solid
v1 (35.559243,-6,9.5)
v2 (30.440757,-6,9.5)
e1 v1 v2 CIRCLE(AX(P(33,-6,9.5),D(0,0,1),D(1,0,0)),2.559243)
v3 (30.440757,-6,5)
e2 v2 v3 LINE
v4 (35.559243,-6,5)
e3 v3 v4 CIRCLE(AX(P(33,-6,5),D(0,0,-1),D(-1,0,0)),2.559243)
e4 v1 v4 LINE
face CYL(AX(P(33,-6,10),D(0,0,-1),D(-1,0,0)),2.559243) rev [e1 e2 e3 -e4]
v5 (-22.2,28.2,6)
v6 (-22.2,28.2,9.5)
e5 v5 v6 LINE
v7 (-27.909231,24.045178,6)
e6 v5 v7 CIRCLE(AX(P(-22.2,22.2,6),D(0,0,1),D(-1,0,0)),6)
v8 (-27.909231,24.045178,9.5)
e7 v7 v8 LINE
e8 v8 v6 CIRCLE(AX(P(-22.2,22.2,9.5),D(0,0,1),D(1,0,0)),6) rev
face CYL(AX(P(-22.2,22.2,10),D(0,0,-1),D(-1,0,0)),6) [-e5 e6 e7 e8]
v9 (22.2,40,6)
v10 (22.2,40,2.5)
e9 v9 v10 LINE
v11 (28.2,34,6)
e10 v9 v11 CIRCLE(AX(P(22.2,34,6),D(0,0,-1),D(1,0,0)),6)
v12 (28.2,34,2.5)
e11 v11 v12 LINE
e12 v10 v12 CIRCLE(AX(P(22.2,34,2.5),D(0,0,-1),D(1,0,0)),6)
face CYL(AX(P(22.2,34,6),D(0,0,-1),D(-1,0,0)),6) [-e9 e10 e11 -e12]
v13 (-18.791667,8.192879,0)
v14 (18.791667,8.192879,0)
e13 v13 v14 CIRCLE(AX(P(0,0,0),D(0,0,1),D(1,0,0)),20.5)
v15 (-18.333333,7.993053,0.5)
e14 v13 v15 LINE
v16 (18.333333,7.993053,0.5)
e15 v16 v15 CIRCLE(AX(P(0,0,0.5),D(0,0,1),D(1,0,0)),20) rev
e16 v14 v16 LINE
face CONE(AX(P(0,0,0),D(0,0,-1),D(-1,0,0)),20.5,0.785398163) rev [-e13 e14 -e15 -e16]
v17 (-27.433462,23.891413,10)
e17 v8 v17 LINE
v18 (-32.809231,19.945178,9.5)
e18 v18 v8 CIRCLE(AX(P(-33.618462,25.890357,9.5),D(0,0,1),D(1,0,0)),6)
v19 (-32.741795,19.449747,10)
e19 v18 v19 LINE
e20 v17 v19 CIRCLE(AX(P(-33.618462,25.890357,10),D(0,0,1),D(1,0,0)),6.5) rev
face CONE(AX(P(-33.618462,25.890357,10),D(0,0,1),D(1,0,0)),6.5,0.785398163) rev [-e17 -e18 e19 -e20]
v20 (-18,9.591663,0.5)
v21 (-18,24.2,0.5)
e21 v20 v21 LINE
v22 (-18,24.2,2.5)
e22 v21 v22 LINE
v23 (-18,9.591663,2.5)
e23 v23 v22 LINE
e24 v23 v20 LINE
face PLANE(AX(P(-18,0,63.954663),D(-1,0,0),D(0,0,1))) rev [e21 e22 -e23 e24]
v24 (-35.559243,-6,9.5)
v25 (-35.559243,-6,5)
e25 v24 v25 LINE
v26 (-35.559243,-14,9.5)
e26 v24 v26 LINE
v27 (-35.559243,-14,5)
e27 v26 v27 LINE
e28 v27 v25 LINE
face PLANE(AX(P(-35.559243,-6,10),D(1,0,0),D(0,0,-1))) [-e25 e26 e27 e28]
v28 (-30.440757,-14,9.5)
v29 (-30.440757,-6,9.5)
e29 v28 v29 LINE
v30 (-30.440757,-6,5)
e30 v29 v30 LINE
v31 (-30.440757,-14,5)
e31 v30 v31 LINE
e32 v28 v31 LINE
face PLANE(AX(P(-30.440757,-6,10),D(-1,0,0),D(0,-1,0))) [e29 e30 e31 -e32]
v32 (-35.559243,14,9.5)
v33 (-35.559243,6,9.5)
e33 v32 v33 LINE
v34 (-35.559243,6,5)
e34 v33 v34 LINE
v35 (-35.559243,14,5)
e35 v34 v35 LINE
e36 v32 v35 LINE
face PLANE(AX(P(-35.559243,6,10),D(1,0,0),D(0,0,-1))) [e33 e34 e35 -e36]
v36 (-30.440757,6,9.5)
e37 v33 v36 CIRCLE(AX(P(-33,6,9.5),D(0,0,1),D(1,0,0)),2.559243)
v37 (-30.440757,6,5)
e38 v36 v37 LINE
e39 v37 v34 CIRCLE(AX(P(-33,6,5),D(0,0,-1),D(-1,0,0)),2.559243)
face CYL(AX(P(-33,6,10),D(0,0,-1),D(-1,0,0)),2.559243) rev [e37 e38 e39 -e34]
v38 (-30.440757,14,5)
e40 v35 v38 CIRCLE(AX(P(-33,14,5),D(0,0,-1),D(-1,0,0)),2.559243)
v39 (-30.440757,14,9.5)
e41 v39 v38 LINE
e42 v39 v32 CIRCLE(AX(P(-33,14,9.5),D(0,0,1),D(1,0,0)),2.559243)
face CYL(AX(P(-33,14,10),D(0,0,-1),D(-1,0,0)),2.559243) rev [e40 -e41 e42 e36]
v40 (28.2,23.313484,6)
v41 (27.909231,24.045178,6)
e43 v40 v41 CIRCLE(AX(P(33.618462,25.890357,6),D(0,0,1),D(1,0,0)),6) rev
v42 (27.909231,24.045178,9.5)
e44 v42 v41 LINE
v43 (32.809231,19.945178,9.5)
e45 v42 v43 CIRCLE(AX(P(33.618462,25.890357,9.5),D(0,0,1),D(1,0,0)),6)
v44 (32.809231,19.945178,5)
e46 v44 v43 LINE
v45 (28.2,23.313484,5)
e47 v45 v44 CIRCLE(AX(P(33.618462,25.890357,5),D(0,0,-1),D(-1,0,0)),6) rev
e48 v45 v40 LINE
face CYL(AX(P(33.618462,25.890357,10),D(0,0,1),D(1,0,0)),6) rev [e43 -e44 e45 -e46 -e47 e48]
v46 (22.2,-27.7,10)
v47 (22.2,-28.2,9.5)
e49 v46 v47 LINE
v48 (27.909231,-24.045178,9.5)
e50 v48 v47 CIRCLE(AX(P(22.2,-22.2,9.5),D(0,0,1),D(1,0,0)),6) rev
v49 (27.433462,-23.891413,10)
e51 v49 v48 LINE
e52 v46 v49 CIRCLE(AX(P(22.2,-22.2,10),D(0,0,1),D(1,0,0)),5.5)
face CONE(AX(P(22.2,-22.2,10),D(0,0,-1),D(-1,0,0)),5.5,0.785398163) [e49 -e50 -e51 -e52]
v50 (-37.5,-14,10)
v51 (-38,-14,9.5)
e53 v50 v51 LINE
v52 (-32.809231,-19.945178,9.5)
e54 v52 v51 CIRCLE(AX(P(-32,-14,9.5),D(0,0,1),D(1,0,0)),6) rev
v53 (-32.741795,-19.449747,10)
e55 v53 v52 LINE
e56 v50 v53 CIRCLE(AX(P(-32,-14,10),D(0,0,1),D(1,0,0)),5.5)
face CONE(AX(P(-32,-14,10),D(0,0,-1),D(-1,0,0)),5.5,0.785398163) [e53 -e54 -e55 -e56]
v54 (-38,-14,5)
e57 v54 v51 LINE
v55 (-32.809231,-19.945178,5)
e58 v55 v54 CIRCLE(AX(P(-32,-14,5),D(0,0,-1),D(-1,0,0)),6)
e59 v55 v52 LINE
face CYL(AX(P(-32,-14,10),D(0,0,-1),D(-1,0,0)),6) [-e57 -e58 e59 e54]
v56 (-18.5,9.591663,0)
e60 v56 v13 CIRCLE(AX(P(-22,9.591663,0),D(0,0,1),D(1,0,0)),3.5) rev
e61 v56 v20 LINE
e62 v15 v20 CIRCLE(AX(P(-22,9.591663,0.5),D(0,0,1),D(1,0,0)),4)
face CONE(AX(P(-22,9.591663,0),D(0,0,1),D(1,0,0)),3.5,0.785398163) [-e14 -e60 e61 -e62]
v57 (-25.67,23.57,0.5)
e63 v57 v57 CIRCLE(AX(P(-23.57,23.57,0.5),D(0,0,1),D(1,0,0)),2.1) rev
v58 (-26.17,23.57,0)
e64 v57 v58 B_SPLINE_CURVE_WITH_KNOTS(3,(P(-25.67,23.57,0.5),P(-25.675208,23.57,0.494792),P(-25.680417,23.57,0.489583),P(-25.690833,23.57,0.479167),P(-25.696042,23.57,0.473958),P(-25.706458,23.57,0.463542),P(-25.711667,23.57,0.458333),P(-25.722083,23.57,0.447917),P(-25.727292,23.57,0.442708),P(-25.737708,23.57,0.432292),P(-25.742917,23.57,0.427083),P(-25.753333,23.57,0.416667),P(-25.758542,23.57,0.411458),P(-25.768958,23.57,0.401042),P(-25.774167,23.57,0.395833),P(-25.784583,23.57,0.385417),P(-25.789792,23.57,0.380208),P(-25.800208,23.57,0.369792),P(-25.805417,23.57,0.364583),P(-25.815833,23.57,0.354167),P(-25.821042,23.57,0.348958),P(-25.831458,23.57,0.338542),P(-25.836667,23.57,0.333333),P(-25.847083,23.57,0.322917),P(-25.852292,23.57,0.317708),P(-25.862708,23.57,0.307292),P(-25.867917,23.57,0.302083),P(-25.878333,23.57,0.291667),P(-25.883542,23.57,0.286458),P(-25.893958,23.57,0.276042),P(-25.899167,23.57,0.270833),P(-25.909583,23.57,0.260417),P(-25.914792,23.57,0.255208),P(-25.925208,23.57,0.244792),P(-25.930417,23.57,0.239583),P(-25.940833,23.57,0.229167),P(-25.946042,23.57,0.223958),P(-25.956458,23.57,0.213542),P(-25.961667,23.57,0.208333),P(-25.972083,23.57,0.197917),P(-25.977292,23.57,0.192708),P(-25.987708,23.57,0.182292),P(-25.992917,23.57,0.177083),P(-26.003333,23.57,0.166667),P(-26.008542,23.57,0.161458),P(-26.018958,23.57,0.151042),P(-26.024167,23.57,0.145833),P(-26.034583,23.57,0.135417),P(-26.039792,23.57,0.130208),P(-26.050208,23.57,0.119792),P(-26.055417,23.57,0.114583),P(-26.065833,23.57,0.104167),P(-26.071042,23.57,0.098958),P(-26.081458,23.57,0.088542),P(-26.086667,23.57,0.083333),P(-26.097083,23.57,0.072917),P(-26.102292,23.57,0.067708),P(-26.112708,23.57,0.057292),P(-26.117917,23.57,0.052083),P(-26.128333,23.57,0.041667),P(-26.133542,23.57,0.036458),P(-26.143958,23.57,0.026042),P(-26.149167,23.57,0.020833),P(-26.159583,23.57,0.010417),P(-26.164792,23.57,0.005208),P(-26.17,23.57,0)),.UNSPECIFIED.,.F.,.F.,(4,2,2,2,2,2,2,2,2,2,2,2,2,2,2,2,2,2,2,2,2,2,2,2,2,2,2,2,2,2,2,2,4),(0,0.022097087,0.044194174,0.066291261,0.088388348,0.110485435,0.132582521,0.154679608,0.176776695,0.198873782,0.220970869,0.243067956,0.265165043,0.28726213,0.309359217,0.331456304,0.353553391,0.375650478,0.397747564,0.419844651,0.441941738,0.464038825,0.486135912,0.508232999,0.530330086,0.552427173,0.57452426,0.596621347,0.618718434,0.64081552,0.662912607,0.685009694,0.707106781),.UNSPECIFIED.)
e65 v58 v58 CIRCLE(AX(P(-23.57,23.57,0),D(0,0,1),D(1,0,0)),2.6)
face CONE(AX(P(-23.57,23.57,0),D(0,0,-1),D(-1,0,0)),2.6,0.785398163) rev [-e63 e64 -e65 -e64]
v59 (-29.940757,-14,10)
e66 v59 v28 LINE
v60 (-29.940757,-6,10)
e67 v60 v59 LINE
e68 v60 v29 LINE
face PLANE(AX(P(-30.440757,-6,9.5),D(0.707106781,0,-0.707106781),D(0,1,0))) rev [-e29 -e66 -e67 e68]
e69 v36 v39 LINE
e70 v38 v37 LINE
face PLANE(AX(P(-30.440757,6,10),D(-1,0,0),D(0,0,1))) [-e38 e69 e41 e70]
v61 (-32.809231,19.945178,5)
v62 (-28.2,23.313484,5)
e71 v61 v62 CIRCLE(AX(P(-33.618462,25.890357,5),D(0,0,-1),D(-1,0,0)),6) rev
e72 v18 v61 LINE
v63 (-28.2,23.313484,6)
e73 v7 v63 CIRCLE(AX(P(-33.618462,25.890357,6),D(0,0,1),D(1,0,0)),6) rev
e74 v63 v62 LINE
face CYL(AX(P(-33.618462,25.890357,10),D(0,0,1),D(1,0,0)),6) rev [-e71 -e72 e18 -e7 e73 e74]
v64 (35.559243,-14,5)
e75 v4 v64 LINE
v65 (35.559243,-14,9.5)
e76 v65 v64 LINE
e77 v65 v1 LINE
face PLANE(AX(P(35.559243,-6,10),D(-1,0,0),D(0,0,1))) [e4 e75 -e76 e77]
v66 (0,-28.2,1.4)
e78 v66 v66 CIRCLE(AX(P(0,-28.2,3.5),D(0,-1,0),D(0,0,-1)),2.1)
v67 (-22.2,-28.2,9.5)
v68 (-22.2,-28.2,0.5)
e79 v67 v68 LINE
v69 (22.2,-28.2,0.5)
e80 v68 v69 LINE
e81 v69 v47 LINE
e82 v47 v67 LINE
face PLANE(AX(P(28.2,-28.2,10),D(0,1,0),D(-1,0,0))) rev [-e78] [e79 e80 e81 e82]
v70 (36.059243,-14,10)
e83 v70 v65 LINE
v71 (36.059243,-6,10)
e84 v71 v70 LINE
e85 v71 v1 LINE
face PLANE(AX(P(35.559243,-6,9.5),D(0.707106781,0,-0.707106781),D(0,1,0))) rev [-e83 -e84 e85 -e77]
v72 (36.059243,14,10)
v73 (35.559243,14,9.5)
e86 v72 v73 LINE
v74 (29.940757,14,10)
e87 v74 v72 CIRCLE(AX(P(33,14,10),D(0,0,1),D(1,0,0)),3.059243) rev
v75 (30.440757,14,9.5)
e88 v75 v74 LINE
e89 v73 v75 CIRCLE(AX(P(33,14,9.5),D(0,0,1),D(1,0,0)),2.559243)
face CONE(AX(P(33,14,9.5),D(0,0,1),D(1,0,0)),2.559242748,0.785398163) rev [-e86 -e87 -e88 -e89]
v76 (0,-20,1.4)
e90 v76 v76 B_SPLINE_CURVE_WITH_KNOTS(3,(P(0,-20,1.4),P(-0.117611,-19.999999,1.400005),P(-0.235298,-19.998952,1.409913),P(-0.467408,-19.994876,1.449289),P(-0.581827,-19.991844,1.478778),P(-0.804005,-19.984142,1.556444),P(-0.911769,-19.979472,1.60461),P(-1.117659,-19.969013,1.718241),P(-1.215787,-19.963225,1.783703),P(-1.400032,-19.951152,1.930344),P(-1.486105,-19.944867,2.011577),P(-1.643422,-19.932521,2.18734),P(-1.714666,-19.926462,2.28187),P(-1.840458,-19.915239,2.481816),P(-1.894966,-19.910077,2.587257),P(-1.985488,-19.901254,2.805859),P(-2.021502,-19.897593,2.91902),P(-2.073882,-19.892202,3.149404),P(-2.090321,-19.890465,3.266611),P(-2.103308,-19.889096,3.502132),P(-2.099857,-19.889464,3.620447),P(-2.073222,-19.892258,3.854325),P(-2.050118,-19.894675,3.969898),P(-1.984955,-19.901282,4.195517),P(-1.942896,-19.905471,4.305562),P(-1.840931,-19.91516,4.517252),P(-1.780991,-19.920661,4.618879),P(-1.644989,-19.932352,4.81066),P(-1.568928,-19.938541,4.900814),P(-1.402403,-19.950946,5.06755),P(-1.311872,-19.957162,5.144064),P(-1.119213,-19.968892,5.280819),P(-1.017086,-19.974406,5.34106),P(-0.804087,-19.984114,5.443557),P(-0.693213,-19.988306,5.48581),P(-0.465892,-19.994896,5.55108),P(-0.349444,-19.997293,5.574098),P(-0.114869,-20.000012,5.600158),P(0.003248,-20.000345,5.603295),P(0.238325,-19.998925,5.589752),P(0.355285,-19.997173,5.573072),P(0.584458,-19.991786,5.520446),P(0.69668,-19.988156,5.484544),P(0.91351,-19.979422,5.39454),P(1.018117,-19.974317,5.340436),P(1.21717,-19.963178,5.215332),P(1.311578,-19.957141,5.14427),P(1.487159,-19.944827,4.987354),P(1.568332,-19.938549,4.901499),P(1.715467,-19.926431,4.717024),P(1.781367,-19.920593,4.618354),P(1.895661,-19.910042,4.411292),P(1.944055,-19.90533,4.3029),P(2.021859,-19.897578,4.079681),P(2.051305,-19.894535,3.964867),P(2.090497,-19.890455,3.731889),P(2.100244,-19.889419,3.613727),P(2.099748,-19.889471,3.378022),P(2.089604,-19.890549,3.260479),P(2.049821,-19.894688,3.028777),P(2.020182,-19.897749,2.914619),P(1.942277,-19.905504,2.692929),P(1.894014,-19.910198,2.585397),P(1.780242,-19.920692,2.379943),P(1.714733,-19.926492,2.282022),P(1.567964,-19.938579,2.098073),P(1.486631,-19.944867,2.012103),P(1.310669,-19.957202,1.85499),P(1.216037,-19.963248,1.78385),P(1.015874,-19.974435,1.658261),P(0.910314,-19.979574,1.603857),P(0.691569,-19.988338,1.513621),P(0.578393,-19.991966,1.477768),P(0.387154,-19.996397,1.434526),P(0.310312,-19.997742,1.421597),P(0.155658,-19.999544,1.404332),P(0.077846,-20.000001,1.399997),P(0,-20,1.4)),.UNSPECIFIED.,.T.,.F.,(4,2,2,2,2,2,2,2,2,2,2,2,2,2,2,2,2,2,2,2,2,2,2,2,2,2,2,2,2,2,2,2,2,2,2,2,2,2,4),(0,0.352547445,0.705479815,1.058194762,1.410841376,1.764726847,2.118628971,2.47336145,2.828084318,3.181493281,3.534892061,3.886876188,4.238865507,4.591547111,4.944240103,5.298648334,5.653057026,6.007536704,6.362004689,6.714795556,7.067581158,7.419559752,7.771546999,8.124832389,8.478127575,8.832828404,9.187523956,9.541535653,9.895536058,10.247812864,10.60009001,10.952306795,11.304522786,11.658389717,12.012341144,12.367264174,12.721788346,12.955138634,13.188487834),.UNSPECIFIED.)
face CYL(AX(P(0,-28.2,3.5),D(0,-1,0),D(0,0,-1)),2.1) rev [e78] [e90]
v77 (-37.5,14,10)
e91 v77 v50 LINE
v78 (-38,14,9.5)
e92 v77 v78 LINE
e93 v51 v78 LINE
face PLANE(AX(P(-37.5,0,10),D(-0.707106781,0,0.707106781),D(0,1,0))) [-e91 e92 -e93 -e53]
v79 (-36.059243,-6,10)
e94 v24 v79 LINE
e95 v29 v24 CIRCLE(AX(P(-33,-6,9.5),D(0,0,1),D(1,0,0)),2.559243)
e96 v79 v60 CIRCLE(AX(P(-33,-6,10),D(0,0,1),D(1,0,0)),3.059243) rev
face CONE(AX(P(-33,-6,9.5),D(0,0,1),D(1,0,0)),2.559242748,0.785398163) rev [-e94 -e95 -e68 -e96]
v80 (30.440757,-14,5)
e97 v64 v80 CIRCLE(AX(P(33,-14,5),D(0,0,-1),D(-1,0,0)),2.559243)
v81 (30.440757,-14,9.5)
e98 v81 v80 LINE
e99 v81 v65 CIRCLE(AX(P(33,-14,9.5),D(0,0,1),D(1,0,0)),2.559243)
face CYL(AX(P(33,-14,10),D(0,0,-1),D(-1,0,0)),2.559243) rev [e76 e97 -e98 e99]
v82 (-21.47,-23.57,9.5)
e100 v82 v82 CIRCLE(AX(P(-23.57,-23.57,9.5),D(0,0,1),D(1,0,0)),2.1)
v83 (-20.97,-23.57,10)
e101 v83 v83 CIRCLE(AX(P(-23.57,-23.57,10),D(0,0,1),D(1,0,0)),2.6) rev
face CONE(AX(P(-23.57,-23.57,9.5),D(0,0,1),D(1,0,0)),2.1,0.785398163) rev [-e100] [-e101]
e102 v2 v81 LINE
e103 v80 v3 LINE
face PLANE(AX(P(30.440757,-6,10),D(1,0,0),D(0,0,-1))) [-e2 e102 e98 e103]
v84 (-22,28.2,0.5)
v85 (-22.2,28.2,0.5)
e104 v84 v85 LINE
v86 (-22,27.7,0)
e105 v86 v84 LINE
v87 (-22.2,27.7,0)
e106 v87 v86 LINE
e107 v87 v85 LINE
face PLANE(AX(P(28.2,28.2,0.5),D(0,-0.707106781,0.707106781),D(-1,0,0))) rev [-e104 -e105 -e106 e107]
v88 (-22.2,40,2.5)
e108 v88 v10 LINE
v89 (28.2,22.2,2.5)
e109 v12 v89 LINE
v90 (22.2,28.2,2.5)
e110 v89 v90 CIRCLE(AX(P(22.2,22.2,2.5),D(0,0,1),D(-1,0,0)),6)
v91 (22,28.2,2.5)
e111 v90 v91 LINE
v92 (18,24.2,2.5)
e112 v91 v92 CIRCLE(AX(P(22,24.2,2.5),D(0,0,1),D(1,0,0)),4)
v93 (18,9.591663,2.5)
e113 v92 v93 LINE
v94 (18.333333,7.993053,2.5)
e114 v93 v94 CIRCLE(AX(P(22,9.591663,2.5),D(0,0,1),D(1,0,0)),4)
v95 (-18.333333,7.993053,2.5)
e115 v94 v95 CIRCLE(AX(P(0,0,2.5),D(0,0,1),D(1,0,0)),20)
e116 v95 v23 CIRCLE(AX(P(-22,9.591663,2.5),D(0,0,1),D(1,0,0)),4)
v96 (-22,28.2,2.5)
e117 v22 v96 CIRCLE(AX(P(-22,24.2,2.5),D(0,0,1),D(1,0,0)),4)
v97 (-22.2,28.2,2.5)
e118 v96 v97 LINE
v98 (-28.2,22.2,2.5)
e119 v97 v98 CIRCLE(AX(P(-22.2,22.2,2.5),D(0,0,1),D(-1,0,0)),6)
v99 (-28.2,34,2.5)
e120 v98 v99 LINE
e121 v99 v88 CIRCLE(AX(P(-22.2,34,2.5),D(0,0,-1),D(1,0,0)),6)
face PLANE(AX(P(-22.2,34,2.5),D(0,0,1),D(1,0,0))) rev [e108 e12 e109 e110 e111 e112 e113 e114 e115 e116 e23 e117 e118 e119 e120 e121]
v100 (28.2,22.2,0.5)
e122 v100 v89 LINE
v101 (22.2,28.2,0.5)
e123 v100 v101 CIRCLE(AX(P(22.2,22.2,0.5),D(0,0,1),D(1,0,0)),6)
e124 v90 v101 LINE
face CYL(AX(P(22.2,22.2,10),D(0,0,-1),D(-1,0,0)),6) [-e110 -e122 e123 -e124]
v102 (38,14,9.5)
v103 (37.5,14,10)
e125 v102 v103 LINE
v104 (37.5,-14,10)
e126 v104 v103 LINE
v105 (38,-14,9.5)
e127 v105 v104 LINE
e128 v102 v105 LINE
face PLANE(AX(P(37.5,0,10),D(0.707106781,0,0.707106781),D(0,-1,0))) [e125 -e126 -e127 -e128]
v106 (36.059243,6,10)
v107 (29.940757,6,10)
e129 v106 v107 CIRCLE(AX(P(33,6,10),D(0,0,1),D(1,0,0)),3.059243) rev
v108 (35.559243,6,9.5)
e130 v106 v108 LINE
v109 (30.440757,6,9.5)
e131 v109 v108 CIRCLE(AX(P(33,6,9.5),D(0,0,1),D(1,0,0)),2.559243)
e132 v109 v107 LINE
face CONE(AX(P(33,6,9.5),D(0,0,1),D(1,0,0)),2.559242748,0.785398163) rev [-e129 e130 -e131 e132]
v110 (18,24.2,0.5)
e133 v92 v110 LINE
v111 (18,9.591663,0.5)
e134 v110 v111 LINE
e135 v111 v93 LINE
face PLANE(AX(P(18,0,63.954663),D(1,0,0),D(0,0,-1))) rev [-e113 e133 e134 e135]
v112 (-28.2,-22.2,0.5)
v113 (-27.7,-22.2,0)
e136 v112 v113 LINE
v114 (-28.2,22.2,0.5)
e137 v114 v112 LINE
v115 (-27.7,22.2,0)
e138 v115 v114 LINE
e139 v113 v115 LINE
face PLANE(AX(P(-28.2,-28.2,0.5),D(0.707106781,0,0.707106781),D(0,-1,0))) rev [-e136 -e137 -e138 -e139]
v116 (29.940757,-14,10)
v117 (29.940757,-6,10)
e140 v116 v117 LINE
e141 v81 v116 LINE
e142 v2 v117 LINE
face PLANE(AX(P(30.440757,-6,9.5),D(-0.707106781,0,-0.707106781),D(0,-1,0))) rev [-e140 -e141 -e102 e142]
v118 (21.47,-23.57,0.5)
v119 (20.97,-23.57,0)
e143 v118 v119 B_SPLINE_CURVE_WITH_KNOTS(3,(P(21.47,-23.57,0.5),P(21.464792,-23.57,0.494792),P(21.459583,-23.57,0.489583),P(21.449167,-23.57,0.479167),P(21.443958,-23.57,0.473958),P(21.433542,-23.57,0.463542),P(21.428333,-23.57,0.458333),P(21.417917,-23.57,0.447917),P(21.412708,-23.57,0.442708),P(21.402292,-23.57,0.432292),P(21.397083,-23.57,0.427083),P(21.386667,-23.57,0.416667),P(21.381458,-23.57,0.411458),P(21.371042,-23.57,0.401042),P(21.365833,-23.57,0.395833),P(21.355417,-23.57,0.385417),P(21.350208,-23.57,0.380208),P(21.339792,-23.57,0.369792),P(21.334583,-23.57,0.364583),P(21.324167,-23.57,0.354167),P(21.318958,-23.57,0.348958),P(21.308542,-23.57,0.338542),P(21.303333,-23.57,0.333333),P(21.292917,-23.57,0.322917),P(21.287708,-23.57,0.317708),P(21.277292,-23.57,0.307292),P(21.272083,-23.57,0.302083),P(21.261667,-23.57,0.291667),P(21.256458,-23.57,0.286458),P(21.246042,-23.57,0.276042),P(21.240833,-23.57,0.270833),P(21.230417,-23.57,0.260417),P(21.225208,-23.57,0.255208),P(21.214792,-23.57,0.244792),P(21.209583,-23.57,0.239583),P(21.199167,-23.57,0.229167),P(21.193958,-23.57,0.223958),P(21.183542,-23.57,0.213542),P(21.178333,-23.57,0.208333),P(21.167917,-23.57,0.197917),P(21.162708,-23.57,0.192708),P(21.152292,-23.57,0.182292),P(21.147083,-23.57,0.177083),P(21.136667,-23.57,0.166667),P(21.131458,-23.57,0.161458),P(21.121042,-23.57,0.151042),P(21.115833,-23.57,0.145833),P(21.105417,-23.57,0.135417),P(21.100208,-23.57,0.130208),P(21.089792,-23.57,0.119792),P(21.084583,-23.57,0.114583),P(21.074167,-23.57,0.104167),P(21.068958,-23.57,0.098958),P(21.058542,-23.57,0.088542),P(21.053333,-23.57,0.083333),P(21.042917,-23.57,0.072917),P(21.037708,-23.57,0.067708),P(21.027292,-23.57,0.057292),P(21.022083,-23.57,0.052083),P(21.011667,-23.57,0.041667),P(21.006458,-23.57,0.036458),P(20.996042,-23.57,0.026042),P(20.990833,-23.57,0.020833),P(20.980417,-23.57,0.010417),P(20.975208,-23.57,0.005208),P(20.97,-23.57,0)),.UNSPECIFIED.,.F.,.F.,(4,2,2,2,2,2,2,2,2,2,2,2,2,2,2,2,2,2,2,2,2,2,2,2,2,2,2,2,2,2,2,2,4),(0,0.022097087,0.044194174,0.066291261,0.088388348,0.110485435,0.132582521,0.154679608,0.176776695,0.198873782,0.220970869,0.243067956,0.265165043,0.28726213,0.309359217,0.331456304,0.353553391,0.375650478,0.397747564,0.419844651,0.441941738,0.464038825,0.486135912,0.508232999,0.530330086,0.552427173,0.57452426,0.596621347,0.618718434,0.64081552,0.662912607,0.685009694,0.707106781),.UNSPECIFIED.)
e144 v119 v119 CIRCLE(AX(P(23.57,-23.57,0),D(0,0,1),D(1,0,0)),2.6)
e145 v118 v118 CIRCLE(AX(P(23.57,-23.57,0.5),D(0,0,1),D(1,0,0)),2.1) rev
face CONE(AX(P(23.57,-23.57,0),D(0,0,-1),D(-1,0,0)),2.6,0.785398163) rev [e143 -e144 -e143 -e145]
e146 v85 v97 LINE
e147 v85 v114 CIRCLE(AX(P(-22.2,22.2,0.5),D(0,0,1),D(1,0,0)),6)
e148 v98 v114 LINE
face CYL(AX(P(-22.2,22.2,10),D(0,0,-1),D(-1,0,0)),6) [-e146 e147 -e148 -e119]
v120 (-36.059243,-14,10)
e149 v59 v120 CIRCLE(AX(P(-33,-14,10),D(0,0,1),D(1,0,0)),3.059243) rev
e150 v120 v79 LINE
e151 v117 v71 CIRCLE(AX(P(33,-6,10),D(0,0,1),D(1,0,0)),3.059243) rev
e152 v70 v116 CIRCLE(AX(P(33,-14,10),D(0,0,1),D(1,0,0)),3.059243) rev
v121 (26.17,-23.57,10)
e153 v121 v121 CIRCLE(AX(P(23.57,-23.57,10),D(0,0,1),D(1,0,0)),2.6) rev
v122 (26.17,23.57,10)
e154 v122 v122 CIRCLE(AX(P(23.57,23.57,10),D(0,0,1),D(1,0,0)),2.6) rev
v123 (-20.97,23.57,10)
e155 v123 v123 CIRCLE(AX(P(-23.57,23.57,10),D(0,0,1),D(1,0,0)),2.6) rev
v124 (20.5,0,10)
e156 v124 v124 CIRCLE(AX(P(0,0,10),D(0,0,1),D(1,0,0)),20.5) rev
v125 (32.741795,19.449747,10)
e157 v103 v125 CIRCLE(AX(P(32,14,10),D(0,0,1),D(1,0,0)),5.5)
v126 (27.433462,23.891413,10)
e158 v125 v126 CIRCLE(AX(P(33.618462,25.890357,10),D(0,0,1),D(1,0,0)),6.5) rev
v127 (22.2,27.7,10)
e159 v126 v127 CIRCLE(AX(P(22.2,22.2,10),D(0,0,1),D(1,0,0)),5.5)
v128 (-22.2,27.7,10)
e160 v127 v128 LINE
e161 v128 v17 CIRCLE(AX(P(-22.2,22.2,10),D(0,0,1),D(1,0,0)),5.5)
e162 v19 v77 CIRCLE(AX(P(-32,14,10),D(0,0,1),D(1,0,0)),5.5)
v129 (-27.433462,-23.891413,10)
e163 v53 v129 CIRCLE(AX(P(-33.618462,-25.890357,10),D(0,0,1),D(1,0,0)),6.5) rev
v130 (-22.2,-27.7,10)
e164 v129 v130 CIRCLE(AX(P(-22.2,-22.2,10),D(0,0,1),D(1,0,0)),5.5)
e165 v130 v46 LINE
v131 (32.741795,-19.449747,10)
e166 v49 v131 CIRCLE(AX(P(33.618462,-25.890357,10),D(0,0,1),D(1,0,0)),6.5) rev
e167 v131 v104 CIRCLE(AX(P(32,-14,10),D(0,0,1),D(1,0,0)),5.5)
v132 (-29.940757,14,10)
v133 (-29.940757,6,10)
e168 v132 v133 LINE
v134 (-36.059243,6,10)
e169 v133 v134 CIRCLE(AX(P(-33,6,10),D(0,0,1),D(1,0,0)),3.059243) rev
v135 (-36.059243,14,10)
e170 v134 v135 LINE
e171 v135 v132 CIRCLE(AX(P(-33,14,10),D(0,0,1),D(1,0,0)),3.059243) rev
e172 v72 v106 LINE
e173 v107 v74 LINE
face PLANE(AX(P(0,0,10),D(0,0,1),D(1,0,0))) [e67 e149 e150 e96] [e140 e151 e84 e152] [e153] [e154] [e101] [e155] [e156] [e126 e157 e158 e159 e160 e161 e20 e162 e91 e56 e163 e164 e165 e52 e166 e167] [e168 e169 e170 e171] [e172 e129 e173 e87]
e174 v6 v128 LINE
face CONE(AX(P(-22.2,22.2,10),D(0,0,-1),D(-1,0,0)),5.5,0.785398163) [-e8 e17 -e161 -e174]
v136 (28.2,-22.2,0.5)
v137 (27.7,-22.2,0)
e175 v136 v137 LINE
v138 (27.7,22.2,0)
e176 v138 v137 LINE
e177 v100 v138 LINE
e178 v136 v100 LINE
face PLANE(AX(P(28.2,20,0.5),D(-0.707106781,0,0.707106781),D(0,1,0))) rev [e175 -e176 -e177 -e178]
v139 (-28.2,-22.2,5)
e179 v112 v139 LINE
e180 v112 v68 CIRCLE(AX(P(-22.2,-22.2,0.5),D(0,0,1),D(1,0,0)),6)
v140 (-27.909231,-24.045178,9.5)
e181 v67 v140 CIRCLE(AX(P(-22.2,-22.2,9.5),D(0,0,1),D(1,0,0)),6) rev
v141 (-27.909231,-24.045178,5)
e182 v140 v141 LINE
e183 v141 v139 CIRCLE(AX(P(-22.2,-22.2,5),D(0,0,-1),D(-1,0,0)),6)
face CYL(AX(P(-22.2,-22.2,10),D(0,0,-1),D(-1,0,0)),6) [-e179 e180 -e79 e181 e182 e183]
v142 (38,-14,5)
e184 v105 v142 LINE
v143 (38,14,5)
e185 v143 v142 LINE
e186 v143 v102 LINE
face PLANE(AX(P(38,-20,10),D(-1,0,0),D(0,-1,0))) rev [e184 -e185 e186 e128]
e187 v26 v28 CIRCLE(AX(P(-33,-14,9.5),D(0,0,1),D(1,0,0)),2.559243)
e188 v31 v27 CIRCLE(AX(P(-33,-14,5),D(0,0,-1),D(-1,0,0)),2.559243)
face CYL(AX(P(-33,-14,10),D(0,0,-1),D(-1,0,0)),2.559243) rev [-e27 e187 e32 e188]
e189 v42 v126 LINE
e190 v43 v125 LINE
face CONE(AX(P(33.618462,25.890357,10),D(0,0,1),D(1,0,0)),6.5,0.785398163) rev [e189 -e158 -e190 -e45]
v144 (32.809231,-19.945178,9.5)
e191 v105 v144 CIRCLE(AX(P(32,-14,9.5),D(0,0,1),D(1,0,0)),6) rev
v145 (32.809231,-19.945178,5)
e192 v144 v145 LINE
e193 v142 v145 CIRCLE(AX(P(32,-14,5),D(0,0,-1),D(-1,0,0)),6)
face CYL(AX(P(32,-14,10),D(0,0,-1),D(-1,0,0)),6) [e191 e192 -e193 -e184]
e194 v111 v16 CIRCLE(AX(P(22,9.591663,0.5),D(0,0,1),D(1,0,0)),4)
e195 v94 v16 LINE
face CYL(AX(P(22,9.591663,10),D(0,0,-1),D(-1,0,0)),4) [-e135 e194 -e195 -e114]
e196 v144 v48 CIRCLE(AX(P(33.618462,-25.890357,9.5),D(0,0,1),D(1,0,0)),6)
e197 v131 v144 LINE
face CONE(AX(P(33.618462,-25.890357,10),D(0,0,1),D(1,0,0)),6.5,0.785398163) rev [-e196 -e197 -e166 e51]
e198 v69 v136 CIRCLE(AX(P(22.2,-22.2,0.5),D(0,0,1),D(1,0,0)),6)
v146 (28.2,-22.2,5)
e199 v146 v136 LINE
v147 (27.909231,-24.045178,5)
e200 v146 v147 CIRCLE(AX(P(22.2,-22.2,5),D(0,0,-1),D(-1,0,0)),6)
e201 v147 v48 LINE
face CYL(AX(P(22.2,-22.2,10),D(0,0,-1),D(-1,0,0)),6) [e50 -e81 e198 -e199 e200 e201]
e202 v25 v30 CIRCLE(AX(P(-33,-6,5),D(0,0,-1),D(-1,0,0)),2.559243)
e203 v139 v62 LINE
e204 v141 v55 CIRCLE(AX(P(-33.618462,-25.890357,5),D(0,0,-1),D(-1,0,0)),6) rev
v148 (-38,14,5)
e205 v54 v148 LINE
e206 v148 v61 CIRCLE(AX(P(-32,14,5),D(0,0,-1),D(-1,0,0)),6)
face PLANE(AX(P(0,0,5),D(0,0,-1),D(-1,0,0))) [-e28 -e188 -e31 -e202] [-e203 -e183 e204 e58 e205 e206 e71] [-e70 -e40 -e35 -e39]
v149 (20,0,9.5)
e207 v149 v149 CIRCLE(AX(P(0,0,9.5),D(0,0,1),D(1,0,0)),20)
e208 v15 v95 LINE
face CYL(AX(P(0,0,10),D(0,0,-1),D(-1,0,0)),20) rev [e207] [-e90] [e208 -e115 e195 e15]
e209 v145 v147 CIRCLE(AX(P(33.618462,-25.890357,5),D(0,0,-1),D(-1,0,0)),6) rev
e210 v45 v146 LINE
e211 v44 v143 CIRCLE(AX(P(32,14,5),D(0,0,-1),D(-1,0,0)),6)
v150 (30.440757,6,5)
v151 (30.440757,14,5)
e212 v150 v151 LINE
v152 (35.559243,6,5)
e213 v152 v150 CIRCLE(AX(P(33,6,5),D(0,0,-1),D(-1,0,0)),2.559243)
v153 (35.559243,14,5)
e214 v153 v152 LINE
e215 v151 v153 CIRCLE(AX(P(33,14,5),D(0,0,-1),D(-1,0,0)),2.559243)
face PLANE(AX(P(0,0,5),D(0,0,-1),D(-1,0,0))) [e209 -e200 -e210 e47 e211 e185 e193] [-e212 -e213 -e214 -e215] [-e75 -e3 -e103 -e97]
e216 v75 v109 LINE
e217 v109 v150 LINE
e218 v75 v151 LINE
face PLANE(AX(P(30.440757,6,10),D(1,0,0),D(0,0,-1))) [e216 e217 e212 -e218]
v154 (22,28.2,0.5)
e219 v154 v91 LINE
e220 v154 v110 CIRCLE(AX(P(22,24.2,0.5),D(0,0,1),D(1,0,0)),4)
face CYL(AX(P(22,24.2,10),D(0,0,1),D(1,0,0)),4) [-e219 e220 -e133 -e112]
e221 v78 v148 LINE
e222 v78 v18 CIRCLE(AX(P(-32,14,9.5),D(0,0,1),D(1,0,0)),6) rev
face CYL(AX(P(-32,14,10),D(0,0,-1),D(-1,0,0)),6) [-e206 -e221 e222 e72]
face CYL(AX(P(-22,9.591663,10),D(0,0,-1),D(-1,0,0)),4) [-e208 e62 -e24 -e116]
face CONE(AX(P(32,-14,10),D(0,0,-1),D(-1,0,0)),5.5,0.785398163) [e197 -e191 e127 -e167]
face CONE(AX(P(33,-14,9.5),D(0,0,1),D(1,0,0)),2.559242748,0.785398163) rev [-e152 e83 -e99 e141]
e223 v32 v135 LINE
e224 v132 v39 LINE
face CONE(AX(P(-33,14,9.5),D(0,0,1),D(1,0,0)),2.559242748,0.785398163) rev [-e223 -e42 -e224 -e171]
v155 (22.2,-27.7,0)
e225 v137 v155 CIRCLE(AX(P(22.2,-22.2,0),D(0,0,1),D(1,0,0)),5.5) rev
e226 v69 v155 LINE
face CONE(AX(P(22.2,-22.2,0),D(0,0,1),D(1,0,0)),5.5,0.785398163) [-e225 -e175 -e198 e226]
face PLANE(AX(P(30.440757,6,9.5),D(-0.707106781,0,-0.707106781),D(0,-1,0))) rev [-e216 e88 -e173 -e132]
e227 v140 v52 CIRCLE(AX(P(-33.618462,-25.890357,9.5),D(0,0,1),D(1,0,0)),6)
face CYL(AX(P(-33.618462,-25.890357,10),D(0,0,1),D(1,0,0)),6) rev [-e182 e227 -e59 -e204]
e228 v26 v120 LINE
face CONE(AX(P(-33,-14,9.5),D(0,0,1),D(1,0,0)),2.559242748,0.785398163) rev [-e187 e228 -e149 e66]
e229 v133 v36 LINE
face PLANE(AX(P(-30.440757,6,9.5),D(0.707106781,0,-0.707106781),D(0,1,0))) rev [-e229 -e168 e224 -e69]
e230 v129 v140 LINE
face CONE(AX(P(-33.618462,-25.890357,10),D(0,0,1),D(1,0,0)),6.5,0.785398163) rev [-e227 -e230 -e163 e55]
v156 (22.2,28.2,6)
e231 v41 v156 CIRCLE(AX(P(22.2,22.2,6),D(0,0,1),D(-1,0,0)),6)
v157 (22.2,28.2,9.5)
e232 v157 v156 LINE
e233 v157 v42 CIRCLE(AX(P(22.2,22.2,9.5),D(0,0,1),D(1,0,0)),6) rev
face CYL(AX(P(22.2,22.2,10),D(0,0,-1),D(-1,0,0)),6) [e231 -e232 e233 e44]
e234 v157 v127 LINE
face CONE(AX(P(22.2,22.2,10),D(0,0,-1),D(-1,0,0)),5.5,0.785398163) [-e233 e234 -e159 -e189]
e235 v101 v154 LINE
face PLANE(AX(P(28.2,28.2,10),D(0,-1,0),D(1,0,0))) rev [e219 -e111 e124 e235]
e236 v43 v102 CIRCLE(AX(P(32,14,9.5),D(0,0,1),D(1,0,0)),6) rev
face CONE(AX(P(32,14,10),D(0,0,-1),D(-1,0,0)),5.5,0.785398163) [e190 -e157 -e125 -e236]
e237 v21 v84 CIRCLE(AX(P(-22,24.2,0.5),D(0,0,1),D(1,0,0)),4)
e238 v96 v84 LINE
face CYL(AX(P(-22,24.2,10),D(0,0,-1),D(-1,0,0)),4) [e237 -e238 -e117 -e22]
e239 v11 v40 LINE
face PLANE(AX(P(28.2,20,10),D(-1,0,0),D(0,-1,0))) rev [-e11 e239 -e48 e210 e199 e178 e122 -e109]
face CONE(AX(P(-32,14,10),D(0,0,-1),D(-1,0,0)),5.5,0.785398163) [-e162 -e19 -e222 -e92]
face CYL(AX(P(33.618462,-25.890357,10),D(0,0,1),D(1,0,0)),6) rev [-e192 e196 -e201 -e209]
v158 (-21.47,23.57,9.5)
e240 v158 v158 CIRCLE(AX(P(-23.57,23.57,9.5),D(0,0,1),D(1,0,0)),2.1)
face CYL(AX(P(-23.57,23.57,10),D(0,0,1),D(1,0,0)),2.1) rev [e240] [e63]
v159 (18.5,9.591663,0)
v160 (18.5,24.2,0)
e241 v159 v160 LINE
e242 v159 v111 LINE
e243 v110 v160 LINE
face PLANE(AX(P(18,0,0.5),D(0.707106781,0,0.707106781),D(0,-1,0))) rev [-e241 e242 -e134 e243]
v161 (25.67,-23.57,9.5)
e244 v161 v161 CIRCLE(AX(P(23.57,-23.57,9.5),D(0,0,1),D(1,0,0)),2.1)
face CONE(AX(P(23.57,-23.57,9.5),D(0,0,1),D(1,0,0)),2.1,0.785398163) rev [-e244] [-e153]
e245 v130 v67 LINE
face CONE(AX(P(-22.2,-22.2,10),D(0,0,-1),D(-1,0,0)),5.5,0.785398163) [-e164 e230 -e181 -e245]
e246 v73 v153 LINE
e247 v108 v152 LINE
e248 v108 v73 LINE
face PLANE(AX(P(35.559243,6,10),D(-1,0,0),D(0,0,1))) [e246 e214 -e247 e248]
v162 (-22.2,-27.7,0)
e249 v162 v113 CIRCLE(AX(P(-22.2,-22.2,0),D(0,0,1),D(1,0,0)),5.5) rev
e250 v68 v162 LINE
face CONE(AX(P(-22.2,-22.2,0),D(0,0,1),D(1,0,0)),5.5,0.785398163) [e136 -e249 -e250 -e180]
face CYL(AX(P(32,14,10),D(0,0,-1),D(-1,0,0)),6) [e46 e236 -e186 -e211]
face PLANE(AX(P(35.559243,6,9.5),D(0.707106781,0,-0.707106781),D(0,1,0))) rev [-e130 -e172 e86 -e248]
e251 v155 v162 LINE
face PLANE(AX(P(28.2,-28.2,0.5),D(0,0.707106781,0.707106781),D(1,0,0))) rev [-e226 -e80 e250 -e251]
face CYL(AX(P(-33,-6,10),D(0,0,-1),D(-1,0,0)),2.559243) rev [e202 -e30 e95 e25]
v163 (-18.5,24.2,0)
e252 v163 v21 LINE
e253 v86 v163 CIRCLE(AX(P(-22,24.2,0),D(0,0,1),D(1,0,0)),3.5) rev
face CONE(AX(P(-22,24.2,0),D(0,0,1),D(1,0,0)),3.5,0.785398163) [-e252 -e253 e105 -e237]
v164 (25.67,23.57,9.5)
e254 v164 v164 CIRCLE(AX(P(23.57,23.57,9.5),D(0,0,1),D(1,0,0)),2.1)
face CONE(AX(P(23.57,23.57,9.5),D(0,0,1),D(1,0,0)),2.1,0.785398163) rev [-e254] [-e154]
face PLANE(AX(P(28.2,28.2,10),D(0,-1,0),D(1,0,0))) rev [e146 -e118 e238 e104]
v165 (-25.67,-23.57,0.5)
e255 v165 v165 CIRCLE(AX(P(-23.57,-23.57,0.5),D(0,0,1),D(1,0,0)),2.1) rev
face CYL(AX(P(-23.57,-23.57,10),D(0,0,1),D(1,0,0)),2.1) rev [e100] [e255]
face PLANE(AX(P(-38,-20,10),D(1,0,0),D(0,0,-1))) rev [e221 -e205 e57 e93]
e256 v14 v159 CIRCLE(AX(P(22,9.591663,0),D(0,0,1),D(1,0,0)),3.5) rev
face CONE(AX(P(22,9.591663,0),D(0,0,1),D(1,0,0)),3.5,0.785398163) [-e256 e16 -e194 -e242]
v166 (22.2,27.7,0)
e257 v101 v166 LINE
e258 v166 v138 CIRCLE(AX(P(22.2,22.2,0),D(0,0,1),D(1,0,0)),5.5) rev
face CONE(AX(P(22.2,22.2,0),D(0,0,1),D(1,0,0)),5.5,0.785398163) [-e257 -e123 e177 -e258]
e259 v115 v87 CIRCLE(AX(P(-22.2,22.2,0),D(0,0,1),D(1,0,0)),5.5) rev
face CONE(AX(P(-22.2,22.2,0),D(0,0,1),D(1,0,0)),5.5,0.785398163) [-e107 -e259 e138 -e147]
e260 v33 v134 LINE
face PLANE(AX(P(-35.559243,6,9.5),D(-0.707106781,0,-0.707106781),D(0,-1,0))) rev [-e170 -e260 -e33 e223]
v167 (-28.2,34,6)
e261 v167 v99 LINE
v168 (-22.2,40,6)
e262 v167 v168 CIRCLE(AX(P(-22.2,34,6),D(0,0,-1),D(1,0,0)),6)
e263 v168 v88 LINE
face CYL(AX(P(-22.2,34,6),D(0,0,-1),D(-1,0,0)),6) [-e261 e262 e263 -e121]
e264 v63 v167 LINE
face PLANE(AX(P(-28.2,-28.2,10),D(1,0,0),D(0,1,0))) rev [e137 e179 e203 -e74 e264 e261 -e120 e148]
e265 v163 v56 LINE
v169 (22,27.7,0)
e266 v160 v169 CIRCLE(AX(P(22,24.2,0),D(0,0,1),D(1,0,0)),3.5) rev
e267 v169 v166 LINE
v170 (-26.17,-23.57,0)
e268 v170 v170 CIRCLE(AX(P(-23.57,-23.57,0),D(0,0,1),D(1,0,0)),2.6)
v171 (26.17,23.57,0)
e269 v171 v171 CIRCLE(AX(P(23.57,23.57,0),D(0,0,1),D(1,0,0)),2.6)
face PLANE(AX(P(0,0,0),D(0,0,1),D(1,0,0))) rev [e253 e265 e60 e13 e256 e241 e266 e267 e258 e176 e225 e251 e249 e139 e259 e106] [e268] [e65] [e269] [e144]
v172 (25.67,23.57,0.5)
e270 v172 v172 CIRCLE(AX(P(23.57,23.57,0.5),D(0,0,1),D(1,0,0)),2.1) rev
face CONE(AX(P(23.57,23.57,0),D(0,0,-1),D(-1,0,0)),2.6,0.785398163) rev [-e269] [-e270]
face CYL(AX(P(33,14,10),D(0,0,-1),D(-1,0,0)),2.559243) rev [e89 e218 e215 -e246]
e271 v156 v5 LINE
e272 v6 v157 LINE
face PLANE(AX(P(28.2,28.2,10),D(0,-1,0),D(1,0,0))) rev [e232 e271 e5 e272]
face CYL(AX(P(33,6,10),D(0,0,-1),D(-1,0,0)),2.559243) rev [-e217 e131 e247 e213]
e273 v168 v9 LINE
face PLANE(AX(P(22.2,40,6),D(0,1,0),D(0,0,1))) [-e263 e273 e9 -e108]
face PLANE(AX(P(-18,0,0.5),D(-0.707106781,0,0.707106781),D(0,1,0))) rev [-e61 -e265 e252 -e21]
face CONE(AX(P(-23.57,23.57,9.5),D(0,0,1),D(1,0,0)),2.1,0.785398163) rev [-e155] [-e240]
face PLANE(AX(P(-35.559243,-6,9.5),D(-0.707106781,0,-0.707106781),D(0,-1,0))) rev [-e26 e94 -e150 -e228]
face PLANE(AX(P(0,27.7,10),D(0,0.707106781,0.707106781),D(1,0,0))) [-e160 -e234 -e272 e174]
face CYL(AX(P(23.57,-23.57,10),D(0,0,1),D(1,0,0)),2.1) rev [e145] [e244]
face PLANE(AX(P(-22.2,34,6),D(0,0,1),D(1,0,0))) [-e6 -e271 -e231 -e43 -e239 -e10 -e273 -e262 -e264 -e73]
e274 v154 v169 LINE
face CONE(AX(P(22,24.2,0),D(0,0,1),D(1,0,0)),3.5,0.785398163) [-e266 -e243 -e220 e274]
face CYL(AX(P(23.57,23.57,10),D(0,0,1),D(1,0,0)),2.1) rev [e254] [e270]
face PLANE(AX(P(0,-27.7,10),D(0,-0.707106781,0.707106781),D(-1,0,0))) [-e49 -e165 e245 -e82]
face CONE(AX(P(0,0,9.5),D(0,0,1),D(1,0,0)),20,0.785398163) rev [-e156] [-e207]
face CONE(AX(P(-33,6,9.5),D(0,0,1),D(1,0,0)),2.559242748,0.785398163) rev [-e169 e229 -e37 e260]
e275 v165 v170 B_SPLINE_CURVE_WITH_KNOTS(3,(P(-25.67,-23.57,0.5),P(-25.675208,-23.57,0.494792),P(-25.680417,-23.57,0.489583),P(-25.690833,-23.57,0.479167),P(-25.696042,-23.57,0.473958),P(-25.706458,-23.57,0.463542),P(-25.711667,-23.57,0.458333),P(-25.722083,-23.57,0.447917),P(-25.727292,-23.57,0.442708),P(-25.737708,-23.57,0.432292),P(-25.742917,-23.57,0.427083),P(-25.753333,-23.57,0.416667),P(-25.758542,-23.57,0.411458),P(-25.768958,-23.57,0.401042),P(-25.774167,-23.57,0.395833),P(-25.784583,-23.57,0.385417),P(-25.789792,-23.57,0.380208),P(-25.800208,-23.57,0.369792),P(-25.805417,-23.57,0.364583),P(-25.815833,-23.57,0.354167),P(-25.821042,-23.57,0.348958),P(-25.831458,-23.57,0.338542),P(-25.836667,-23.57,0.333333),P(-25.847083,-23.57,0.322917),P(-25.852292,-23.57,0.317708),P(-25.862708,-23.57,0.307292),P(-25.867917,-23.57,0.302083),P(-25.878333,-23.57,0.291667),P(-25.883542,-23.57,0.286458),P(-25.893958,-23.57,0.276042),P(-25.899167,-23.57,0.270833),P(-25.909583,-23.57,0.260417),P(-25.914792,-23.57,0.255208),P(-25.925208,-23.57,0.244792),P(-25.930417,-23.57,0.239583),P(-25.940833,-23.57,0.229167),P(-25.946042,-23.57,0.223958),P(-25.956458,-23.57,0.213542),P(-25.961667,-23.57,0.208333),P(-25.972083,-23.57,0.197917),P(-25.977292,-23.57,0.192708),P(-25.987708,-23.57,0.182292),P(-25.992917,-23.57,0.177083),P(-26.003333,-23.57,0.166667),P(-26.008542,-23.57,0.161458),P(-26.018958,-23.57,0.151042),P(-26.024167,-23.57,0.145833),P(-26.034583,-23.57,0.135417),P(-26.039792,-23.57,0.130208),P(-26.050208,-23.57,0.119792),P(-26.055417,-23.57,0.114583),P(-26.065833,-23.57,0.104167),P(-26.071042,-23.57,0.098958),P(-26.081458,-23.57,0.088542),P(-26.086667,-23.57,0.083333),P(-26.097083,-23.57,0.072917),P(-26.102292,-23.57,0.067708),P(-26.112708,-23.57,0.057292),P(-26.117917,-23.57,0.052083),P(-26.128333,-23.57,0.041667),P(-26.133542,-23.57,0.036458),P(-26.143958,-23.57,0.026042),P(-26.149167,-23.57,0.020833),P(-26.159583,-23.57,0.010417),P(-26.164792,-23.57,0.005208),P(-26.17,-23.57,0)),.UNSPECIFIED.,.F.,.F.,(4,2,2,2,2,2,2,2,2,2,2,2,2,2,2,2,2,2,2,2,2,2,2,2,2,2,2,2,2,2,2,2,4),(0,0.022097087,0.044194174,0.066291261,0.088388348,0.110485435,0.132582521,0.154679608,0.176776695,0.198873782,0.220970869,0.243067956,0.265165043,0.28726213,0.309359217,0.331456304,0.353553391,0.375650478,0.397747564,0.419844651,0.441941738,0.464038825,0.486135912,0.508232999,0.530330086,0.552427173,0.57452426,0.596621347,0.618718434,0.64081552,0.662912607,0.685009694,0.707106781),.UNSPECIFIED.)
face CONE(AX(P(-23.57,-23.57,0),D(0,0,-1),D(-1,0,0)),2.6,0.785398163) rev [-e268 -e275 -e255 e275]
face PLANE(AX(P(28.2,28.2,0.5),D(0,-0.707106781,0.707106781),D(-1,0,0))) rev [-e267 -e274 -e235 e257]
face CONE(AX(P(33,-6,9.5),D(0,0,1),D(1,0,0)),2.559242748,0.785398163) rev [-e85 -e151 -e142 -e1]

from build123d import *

# Parameters (mm, degrees)
SKETCH1_R                   = 20
BOSS_EXTRUDE1_DEPTH         = 10
FILLET1_R                   = 6
TAP_DRILL_FOR_M5_TAP1_D     = 4.2
CUT_EXTRUDE2_START          = 5
SKETCH4_OUTSIDE_W           = 97.034
SKETCH4_OUTSIDE_H           = 77.434
SKETCH4_OUTSIDE_W_2         = 56.4
SKETCH4_OUTSIDE_H_2         = 56.4
CUT_EXTRUDE2_DEPTH          = 44.365690319
FILLET2_R                   = 6
FILLET3_R                   = 6
TAP_DRILL_FOR_M5_TAP2_D     = 4.2
TAP_DRILL_FOR_M5_TAP2_DEPTH = 20
TAP_DRILL_FOR_M5_TAP2_TIP   = 1.2618073
BOSS_EXTRUDE2_START         = -6
BOSS_EXTRUDE2_DEPTH         = 3.5
SKETCH10_W                  = 36
SKETCH10_H                  = 49.806381251
CUT_EXTRUDE3_DEPTH          = 2.5
FILLET4_R                   = 4
CHAMFER1_SIZE               = 0.5


with BuildPart() as part:
    # Sketch1 → Boss-Extrude1 (new body)
    with BuildSketch(Plane.XY):
        Polygon((-28.2, -20), (-38, -20), (-38, 20), (-28.2, 20), (-28.2, 28.2), (28.2, 28.2), (28.2, 20), (38, 20), (38, -20), (28.2, -20), (28.2, -28.2), (-28.2, -28.2), align=None)
        Circle(SKETCH1_R, mode=Mode.SUBTRACT)
        with BuildLine():
            Line((-35.559242748, 6), (-35.559242748, 14))
            ThreePointArc((-35.559242748, 14), (-33, 16.559242748), (-30.440757252, 14))
            Line((-30.440757252, 14), (-30.440757252, 6))
            ThreePointArc((-30.440757252, 6), (-33, 3.440757252), (-35.559242748, 6))
        make_face(mode=Mode.SUBTRACT)
        with BuildLine():
            Line((-30.440757252, -6), (-30.440757252, -14))
            ThreePointArc((-30.440757252, -14), (-33, -16.559242748), (-35.559242748, -14))
            Line((-35.559242748, -14), (-35.559242748, -6))
            ThreePointArc((-35.559242748, -6), (-33, -3.440757252), (-30.440757252, -6))
        make_face(mode=Mode.SUBTRACT)
        with BuildLine():
            Line((35.559242748, -6), (35.559242748, -14))
            ThreePointArc((35.559242748, -14), (33, -16.559242748), (30.440757252, -14))
            Line((30.440757252, -14), (30.440757252, -6))
            ThreePointArc((30.440757252, -6), (33, -3.440757252), (35.559242748, -6))
        make_face(mode=Mode.SUBTRACT)
        with BuildLine():
            Line((30.440757252, 6), (30.440757252, 14))
            ThreePointArc((30.440757252, 14), (33, 16.559242748), (35.559242748, 14))
            Line((35.559242748, 14), (35.559242748, 6))
            ThreePointArc((35.559242748, 6), (33, 3.440757252), (30.440757252, 6))
        make_face(mode=Mode.SUBTRACT)
    extrude(amount=BOSS_EXTRUDE1_DEPTH)

    # Fillet1
    fillet1_edges = [part.edges().sort_by_distance(p)[0] for p in [
        (-28.2, 28.2, 5),
        (28.2, 28.2, 5),
        (28.2, -28.2, 5),
        (-28.2, -28.2, 5),
    ]]
    fillet(fillet1_edges, radius=FILLET1_R)

    # Tap Drill for M5 Tap1 (through all)
    with Locations(Plane.XY.offset(10)):
        with Locations((0, 0), (23.57, -23.57), (-23.57, 23.57), (-23.57, -23.57), (23.57, 23.57)):
            Hole(TAP_DRILL_FOR_M5_TAP1_D / 2)

    # Sketch4 outside → Cut-Extrude2 (cut, through all)
    with BuildSketch(Plane(origin=(0, 0, 10), x_dir=(-1, 0, 0), z_dir=(0, 0, -1)).offset(CUT_EXTRUDE2_START)):
        Rectangle(SKETCH4_OUTSIDE_W, SKETCH4_OUTSIDE_H)
        Rectangle(SKETCH4_OUTSIDE_W_2, SKETCH4_OUTSIDE_H_2, mode=Mode.SUBTRACT)
    extrude(amount=CUT_EXTRUDE2_DEPTH, mode=Mode.SUBTRACT)

    # Fillet2
    fillet2_edges = [part.edges().sort_by_distance(p)[0] for p in [
        (38, 20, 7.5),
        (38, -20, 7.5),
        (-38, -20, 7.5),
        (-38, 20, 7.5),
    ]]
    fillet(fillet2_edges, radius=FILLET2_R)

    # Fillet3
    # the kernel refuses this fillet: 6 mm, written as the material it adds along each edge
    with BuildSketch(Plane(origin=(-28.2, -20, 5), x_dir=(0.07169544842088547, -0.9974265700670543, 0), z_dir=(0, 0, 1)), Plane(origin=(28.2, 20, 5), x_dir=(-0.0716954484208838, 0.9974265700670545, 0), z_dir=(0, 0, 1))) as fillet3_piece_1:
        with BuildLine():
            CenterArc((5.486719207, -5.826829434), FILLET3_R, 103.799048999, 64.338369747)
            Line((-0.385141459, -4.593438855), (-0.972327525, -4.470099797))
            ThreePointArc((-0.972327525, -4.470099797), (-0.870898646, -3.747203697), (-0.598455942, 0.043017269))
            Line((-0.598455942, 0.043017269), (0.043017269, 0.598455942))
            ThreePointArc((0.043017269, 0.598455942), (2.237355723, 0.440725956), (3.912504773, 0.582682943))
            Line((3.912504773, 0.582682943), (4.055615176, 0))
        make_face()
    extrude(amount=5)
    with BuildSketch(Plane(origin=(-28.2, 20, 5), x_dir=(-0.9999292752437037, -0.011893044631264506, 0), z_dir=(0, 0, 1)), Plane(origin=(28.2, -20, 5), x_dir=(0.9999292752437039, 0.011893044631263755, 0), z_dir=(0, 0, 1))) as fillet3_piece_2:
        with BuildLine():
            CenterArc((5.348024209, -5.954382082), FILLET3_R, 97.069769939, 64.338369747)
            Line((-0.338858071, -4.04143411), (-0.907546298, -3.850139313))
            ThreePointArc((-0.907546298, -3.850139313), (-0.626122263, -2.192708579), (-0.599957565, 0.007135827))
            Line((-0.599957565, 0.007135827), (0.007135827, 0.599957565))
            ThreePointArc((0.007135827, 0.599957565), (3.806867073, 0.554763996), (4.535710126, 0.595438208))
            Line((4.535710126, 0.595438208), (4.609556861, 0))
        make_face()
    extrude(amount=5)

    # Tap Drill for M5 Tap2
    with Locations(Plane(origin=(0, -28.2, 0), x_dir=(-1, 0, 0), z_dir=(0, -1, 0))):
        with Locations((0, -3.5)):
            Hole(TAP_DRILL_FOR_M5_TAP2_D / 2, depth=TAP_DRILL_FOR_M5_TAP2_DEPTH)
            with Locations((0, 0, -(TAP_DRILL_FOR_M5_TAP2_DEPTH + TAP_DRILL_FOR_M5_TAP2_TIP / 2))):  # 118° drill point
                Cone(0, TAP_DRILL_FOR_M5_TAP2_D / 2, TAP_DRILL_FOR_M5_TAP2_TIP, mode=Mode.SUBTRACT)

    # Sketch9 → Boss-Extrude2 (add)
    with BuildSketch(Plane(origin=(0, 0, 0), x_dir=(-1, 0, 0), z_dir=(0, 0, -1)).offset(BOSS_EXTRUDE2_START)):
        with BuildLine():
            Line((-28.2, 22.2), (-28.2, 34))
            ThreePointArc((-28.2, 34), (-26.442640687, 38.242640687), (-22.2, 40))
            Line((-22.2, 40), (22.2, 40))
            ThreePointArc((22.2, 40), (26.442640687, 38.242640687), (28.2, 34))
            Line((28.2, 34), (28.2, 22.2))
            ThreePointArc((28.2, 22.2), (26.442640687, 26.442640687), (22.2, 28.2))
            Line((22.2, 28.2), (-22.2, 28.2))
            ThreePointArc((-22.2, 28.2), (-26.442640687, 26.442640687), (-28.2, 22.2))
        make_face()
    extrude(amount=BOSS_EXTRUDE2_DEPTH)

    # Sketch10 → Cut-Extrude3 (cut)
    with BuildSketch(Plane(origin=(0, 0, 0), x_dir=(-1, 0, 0), z_dir=(0, 0, -1))):
        with Locations((0, 24.903190626)):
            Rectangle(SKETCH10_W, SKETCH10_H)
    extrude(amount=-CUT_EXTRUDE3_DEPTH, mode=Mode.SUBTRACT)

    # Fillet4
    fillet4_edges = [part.edges().sort_by_distance(p)[0] for p in [
        (-18, 28.2, 1.25),
        (-18, 8.717797887, 1.25),
        (18, 28.2, 1.25),
        (18, 8.717797887, 1.25),
    ]]
    fillet(fillet4_edges, radius=FILLET4_R)

    # Chamfer1
    chamfer1_edges = [part.edges().sort_by_distance(p)[0] for p in [
        (0, -28.2, 10),
        (25.730504921, -27.051343629, 10),
        (-25.730504921, 27.051343629, 10),
        (28.2, 0, 0),
        (25.67, 23.57, 10),
        (25.67, 23.57, 0),
        (-21.47, -23.57, 10),
        (-21.47, -23.57, 0),
        (-21.47, 23.57, 10),
        (-21.47, 23.57, 0),
        (-28.2, 0, 0),
        (25.67, -23.57, 10),
        (25.67, -23.57, 0),
        (38, 0, 10),
        (-38, 0, 10),
        (-36.519700494, -17.946176307, 10),
        (36.519700494, 17.946176307, 10),
        (-25.730504921, -27.051343629, 10),
        (-36.519700494, 17.946176307, 10),
        (25.730504921, 27.051343629, 10),
        (36.519700494, -17.946176307, 10),
        (-29.768125907, -21.28873584, 10),
        (-29.768125907, 21.28873584, 10),
        (29.768125907, 21.28873584, 10),
        (29.768125907, -21.28873584, 10),
        (-33, 3.440757252, 10),
        (-30.440757252, 10, 10),
        (-33, 16.559242748, 10),
        (-35.559242748, 10, 10),
        (-22.1, 28.2, 0),
        (-18, 16.895831523, 0),
        (-4.082482905, -19.578900207, 0),
        (18, 16.895831523, 0),
        (-18.084219959, 8.775166466, 0),
        (18.084219959, 8.775166466, 0),
        (19.171572875, 27.028427125, 0),
        (-19.171572875, 27.028427125, 0),
        (-33, -3.440757252, 10),
        (-35.559242748, -10, 10),
        (-33, -16.559242748, 10),
        (-30.440757252, -10, 10),
        (33, -3.440757252, 10),
        (30.440757252, -10, 10),
        (33, -16.559242748, 10),
        (35.559242748, -10, 10),
        (33, 3.440757252, 10),
        (35.559242748, 10, 10),
        (33, 16.559242748, 10),
        (30.440757252, 10, 10),
        (-20, 0, 10),
        (22.1, 28.2, 0),
        (0, 28.2, 10),
        (0, -28.2, 0),
        (26.442640687, -26.442640687, 0),
        (-26.442640687, -26.442640687, 0),
        (-26.442640687, 26.442640687, 0),
        (26.442640687, 26.442640687, 0),
    ]]
    chamfer(chamfer1_edges, length=CHAMFER1_SIZE)


solid = part.part
